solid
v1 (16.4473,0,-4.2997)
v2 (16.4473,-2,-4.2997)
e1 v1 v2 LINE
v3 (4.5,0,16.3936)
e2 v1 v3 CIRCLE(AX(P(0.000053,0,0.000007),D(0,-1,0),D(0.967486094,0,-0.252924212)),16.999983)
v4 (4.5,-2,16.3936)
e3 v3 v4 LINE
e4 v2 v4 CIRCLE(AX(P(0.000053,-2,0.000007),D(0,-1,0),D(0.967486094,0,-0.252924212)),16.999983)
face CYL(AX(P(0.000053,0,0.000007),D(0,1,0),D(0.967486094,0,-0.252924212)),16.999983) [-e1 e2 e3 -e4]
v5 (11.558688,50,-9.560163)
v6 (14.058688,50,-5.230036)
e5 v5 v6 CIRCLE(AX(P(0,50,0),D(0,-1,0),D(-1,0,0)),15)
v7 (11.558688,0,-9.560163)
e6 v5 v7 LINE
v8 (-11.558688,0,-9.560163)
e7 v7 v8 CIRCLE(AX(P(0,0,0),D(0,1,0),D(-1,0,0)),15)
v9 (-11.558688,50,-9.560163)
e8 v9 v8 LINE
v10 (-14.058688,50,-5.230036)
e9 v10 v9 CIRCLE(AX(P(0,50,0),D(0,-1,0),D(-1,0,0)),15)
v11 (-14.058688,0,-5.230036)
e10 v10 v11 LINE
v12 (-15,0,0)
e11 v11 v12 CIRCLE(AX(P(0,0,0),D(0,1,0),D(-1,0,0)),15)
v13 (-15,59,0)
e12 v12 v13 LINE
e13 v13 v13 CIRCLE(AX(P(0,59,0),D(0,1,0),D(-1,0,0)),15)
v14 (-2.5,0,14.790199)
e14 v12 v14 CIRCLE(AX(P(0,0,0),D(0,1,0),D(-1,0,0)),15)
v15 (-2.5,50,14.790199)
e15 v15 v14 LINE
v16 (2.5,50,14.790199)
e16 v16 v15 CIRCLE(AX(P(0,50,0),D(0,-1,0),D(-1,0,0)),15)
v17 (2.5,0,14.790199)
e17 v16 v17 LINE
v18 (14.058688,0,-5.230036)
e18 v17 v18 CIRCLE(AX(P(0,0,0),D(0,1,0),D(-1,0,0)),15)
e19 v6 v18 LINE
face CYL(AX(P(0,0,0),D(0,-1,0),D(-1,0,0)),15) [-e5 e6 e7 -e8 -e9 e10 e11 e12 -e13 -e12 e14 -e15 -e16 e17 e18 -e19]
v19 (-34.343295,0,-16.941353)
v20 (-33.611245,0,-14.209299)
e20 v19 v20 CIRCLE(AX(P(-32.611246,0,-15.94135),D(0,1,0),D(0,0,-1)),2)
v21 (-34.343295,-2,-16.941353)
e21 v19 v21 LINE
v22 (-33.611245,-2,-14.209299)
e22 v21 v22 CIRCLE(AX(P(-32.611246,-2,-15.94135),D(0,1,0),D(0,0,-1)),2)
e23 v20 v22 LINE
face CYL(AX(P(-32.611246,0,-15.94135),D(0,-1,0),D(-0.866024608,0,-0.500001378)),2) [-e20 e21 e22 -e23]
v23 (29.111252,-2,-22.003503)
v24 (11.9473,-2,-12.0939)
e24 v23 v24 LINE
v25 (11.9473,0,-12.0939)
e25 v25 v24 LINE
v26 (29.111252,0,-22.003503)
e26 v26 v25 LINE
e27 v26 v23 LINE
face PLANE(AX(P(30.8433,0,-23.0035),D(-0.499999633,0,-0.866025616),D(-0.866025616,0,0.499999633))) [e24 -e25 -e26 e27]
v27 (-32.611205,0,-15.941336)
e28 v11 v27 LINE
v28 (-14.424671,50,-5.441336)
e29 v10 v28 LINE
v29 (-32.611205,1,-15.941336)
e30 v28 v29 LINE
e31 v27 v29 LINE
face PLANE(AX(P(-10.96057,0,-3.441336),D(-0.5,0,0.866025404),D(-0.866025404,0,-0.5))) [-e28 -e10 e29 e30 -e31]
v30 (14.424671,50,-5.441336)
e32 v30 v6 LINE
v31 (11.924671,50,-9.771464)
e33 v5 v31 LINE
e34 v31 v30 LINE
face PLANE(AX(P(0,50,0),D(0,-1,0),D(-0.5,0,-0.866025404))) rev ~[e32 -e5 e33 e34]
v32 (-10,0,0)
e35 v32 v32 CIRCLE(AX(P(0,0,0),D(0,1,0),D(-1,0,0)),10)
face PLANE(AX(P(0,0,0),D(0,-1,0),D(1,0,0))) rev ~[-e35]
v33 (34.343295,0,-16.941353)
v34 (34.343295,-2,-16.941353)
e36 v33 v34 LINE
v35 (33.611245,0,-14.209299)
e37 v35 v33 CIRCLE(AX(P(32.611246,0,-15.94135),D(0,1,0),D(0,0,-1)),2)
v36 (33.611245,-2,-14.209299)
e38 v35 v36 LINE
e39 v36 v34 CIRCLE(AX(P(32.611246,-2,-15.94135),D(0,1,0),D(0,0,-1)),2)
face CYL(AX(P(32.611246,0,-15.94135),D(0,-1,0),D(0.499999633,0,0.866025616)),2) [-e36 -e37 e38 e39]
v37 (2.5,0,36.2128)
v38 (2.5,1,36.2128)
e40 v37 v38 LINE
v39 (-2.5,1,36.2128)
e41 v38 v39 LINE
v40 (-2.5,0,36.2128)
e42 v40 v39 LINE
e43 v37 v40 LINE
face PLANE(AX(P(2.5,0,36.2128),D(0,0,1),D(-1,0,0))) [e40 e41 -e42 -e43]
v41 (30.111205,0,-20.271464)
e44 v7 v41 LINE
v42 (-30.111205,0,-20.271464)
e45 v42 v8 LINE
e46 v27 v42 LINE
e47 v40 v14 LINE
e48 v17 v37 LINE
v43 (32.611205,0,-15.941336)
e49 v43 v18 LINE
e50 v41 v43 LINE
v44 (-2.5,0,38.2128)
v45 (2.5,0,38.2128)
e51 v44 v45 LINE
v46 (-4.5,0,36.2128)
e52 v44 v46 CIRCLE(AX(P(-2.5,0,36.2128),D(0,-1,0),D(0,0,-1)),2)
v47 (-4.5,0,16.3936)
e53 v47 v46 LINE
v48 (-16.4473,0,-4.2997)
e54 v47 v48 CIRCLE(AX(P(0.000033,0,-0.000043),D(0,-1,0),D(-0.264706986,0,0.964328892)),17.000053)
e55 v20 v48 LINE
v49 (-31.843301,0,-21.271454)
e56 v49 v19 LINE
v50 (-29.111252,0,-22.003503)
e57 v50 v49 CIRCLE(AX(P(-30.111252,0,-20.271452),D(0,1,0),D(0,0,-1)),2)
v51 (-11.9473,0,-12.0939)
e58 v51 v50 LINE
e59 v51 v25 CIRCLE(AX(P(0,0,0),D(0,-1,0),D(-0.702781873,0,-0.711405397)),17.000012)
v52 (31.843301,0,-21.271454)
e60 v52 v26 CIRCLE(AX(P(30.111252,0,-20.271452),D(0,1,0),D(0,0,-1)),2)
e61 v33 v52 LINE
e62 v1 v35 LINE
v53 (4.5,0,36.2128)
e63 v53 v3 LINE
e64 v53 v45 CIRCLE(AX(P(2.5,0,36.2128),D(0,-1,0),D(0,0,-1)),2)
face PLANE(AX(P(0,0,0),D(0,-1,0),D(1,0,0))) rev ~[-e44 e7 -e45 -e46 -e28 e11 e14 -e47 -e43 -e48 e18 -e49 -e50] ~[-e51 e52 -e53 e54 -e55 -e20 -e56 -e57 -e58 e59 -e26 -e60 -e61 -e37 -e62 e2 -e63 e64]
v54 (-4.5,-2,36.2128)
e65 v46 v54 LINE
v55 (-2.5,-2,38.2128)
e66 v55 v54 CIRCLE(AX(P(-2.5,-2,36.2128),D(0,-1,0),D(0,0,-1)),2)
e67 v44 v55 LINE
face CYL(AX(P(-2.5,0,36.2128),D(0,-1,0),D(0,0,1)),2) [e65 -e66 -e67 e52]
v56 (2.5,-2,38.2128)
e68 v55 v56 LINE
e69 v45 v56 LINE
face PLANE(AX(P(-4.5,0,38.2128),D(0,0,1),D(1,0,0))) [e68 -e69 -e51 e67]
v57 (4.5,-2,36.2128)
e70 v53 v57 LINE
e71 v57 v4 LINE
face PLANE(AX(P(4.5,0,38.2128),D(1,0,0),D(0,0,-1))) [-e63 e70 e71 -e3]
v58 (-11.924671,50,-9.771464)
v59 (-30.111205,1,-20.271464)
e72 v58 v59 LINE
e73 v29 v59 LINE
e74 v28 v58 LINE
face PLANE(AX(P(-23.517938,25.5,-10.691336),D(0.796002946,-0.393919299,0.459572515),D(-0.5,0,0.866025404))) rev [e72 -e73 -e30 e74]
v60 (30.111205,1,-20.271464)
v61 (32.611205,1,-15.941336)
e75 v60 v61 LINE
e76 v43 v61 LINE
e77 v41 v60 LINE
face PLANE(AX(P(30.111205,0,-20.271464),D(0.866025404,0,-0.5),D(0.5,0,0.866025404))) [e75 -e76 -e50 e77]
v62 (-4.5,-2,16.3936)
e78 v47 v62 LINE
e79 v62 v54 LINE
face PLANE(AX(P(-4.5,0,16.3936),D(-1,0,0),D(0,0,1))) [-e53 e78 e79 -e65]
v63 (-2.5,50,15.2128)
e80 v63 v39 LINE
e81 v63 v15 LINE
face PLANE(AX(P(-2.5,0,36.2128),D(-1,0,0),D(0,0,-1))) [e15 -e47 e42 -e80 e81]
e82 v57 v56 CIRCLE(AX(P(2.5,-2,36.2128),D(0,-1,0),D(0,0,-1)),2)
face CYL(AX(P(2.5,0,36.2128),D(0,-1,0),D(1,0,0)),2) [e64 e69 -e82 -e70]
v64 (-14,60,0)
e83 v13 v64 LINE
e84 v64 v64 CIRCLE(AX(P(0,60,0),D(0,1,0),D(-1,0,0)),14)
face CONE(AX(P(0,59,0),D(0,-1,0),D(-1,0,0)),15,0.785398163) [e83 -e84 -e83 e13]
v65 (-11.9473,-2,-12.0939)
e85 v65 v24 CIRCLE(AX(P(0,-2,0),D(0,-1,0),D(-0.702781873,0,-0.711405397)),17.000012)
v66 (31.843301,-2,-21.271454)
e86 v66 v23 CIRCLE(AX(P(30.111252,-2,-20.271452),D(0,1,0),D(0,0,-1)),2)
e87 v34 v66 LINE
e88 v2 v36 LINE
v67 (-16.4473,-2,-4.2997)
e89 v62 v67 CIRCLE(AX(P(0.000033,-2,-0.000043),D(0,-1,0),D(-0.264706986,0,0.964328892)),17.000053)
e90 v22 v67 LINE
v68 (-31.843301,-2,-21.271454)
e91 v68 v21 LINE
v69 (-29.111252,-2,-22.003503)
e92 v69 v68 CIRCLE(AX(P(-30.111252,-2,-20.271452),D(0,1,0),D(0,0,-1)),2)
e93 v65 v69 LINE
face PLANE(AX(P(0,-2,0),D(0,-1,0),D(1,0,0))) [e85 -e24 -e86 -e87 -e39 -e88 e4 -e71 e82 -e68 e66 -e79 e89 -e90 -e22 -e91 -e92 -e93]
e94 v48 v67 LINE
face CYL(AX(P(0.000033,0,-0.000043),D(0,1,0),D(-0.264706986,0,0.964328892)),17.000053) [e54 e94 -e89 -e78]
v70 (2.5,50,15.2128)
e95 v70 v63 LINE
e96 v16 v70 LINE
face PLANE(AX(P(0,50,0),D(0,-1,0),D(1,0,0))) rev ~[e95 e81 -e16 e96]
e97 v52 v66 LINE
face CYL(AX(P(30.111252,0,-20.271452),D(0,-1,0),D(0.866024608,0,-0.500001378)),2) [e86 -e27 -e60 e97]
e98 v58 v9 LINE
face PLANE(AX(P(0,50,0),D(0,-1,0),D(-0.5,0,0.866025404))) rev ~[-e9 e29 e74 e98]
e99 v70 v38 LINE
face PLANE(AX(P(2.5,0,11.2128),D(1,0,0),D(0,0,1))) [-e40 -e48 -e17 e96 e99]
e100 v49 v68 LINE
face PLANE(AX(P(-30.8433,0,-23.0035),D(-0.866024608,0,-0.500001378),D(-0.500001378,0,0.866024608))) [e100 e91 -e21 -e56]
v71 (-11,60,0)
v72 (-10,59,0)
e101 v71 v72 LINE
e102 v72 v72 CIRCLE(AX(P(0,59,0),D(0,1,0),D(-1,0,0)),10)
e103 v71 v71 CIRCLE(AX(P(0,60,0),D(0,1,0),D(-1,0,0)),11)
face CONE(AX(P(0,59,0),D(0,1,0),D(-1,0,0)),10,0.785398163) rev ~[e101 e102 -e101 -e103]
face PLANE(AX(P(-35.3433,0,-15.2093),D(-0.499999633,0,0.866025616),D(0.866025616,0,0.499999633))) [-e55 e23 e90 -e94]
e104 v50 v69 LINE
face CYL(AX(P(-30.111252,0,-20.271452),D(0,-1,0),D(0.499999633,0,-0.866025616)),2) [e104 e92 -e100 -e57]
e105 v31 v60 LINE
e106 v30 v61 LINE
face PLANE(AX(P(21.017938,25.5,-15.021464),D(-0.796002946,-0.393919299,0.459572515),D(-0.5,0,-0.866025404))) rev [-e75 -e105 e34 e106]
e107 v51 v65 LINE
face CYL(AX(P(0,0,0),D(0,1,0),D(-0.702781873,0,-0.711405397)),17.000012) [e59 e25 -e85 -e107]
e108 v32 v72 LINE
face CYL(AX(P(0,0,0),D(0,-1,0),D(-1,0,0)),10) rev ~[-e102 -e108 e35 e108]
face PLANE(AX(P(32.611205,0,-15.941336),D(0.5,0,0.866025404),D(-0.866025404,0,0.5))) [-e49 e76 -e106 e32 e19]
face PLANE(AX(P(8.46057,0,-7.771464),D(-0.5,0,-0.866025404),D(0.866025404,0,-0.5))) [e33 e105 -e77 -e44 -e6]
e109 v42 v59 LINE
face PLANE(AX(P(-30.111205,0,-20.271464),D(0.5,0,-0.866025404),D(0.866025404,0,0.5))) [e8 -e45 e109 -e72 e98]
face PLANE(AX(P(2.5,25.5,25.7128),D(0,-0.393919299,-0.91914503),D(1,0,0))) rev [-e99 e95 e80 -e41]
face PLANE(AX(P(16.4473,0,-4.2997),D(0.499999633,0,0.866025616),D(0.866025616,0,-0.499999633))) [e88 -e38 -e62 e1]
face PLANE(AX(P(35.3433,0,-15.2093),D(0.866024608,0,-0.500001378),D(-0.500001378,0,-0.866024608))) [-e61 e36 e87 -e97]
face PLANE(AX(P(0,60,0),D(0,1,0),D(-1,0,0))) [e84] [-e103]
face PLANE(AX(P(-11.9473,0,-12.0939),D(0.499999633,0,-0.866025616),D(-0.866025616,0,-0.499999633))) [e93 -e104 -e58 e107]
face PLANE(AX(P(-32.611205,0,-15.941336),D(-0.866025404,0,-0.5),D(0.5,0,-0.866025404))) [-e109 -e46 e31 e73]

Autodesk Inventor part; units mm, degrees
ref_plane "YZ Plane" through (0, 0, 0) normal (1, 0, 0) x (0, 1, 0)
ref_plane "XZ Plane" through (0, 0, 0) normal (0, 1, 0) x (-1, 0, 0)
ref_plane "XY Plane" through (0, 0, 0) normal (0, 0, 1) x (1, 0, 0)
sketch "Szkic1" plane through (0, 0, 0) normal (0, 1, 0) x (-1, 0, 0)
  circle A0 centre (0, 0) radius 10
  circle A1 centre (0, 0) radius 15
  dimension "d0" = 20
  dimension "d1" = 30
extrude "Wyciągnięcie proste1" add sketch "Szkic1" along normal blind 60
sketch "Szkic2" plane through (0, 0, 0) normal (0, -1, 0) x (1, 0, 0)
  line L0 (2.5, 36.2128) -> (-2.5, 36.2128)
  line L1 (-2.5, 36.2128) -> (-2.5, 11.2128)
  line L2 (-2.5, 11.2128) -> (2.5, 11.2128)
  line L3 (2.5, 11.2128) -> (2.5, 36.2128)
  line L4 (2.5, 36.2128) -> (-2.5, 11.2128) construction
  line L5 (-2.5, 36.2128) -> (2.5, 11.2128) construction
  point P0 (0, 0)
  point P1 (0, 23.7128)
  dimension "d4" = 5
  dimension "d5" = 25
extrude "Wyciągnięcie proste2" add sketch "Szkic2" against normal blind 50
chamfer "Faza1" distance 21 distance2 49 1 edges at (0, 50, 36.2128) measured on face at (-0.2789, 50, 29.1341)
pattern_circular "Szyk kołowy1" count 3 over 360 about axis through (0, 0, 0) along (0, 1, 0) of "Faza1", "Wyciągnięcie proste2"
sketch "Szkic3" plane through (0, 0, 0) normal (0, -1, 0) x (1, 0, 0)
  arc A0 (-11.5587, -9.5602) -> (11.5587, -9.5602) centre (0, 0) ccw projected
  line L0 (11.5587, -9.5602) -> (30.1112, -20.2715) projected
  line L1 (30.1112, -20.2715) -> (32.6112, -15.9413) projected
  line L2 (32.6112, -15.9413) -> (14.0587, -5.23) projected
  arc A1 (14.0587, -5.23) -> (2.5, 14.7902) centre (0, 0) ccw projected
  line L3 (2.5, 14.7902) -> (2.5, 36.2128) projected
  line L4 (2.5, 36.2128) -> (-2.5, 36.2128) projected
  line L5 (-2.5, 36.2128) -> (-2.5, 14.7902) projected
  arc A2 (-2.5, 14.7902) -> (-14.0587, -5.23) centre (0, 0) ccw projected
  line L6 (-14.0587, -5.23) -> (-32.6112, -15.9413) projected
  line L7 (-32.6112, -15.9413) -> (-30.1112, -20.2715) projected
  line L8 (-30.1112, -20.2715) -> (-11.5587, -9.5602) projected
  circle A3 centre (0, 0) radius 10 projected
  arc A4 (16.4473, -4.2997) -> (4.5, 16.3936) centre (0, 0) ccw
  line L9 (16.4473, -4.2997) -> (35.3433, -15.2093)
  line L10 (35.3433, -15.2093) -> (30.8433, -23.0035)
  line L11 (30.8433, -23.0035) -> (11.9473, -12.0939)
  arc A5 (-11.9473, -12.0939) -> (11.9473, -12.0939) centre (0, 0) ccw
  line L12 (-11.9473, -12.0939) -> (-30.8433, -23.0035)
  line L13 (-30.8433, -23.0035) -> (-35.3433, -15.2093)
  line L14 (-35.3433, -15.2093) -> (-16.4473, -4.2997)
  arc A6 (-4.5, 16.3936) -> (-16.4473, -4.2997) centre (0, 0) ccw
  line L15 (-4.5, 16.3936) -> (-4.5, 38.2128)
  line L16 (-4.5, 38.2128) -> (4.5, 38.2128)
  line L17 (4.5, 38.2128) -> (4.5, 16.3936)
  dimension "d14" = 2
extrude "Wyciągnięcie proste3" add sketch "Szkic3" along normal blind 2 contours L8 L7 L6 A2 L5 L4 L3 A1 L2 L1 L0 A0 | A3 | L9 L10 L11 A5 L12 L13 L14 A6 L15 L16 L17 A4
fillet "Zaokrąglenie1" radius 2 6 edges at (35.3433, -1, -15.2093) (30.8433, -1, -23.0035) (-30.8433, -1, -23.0035) (-35.3433, -1, -15.2093) (-4.5, -1, 38.2128) (4.5, -1, 38.2128)
chamfer "Faza2" distance 1 angle 45 2 edges at (15, 60, 0) (10, 60, 0)
properties part number "stojak" material "Polietylen, o małej gęstości"
